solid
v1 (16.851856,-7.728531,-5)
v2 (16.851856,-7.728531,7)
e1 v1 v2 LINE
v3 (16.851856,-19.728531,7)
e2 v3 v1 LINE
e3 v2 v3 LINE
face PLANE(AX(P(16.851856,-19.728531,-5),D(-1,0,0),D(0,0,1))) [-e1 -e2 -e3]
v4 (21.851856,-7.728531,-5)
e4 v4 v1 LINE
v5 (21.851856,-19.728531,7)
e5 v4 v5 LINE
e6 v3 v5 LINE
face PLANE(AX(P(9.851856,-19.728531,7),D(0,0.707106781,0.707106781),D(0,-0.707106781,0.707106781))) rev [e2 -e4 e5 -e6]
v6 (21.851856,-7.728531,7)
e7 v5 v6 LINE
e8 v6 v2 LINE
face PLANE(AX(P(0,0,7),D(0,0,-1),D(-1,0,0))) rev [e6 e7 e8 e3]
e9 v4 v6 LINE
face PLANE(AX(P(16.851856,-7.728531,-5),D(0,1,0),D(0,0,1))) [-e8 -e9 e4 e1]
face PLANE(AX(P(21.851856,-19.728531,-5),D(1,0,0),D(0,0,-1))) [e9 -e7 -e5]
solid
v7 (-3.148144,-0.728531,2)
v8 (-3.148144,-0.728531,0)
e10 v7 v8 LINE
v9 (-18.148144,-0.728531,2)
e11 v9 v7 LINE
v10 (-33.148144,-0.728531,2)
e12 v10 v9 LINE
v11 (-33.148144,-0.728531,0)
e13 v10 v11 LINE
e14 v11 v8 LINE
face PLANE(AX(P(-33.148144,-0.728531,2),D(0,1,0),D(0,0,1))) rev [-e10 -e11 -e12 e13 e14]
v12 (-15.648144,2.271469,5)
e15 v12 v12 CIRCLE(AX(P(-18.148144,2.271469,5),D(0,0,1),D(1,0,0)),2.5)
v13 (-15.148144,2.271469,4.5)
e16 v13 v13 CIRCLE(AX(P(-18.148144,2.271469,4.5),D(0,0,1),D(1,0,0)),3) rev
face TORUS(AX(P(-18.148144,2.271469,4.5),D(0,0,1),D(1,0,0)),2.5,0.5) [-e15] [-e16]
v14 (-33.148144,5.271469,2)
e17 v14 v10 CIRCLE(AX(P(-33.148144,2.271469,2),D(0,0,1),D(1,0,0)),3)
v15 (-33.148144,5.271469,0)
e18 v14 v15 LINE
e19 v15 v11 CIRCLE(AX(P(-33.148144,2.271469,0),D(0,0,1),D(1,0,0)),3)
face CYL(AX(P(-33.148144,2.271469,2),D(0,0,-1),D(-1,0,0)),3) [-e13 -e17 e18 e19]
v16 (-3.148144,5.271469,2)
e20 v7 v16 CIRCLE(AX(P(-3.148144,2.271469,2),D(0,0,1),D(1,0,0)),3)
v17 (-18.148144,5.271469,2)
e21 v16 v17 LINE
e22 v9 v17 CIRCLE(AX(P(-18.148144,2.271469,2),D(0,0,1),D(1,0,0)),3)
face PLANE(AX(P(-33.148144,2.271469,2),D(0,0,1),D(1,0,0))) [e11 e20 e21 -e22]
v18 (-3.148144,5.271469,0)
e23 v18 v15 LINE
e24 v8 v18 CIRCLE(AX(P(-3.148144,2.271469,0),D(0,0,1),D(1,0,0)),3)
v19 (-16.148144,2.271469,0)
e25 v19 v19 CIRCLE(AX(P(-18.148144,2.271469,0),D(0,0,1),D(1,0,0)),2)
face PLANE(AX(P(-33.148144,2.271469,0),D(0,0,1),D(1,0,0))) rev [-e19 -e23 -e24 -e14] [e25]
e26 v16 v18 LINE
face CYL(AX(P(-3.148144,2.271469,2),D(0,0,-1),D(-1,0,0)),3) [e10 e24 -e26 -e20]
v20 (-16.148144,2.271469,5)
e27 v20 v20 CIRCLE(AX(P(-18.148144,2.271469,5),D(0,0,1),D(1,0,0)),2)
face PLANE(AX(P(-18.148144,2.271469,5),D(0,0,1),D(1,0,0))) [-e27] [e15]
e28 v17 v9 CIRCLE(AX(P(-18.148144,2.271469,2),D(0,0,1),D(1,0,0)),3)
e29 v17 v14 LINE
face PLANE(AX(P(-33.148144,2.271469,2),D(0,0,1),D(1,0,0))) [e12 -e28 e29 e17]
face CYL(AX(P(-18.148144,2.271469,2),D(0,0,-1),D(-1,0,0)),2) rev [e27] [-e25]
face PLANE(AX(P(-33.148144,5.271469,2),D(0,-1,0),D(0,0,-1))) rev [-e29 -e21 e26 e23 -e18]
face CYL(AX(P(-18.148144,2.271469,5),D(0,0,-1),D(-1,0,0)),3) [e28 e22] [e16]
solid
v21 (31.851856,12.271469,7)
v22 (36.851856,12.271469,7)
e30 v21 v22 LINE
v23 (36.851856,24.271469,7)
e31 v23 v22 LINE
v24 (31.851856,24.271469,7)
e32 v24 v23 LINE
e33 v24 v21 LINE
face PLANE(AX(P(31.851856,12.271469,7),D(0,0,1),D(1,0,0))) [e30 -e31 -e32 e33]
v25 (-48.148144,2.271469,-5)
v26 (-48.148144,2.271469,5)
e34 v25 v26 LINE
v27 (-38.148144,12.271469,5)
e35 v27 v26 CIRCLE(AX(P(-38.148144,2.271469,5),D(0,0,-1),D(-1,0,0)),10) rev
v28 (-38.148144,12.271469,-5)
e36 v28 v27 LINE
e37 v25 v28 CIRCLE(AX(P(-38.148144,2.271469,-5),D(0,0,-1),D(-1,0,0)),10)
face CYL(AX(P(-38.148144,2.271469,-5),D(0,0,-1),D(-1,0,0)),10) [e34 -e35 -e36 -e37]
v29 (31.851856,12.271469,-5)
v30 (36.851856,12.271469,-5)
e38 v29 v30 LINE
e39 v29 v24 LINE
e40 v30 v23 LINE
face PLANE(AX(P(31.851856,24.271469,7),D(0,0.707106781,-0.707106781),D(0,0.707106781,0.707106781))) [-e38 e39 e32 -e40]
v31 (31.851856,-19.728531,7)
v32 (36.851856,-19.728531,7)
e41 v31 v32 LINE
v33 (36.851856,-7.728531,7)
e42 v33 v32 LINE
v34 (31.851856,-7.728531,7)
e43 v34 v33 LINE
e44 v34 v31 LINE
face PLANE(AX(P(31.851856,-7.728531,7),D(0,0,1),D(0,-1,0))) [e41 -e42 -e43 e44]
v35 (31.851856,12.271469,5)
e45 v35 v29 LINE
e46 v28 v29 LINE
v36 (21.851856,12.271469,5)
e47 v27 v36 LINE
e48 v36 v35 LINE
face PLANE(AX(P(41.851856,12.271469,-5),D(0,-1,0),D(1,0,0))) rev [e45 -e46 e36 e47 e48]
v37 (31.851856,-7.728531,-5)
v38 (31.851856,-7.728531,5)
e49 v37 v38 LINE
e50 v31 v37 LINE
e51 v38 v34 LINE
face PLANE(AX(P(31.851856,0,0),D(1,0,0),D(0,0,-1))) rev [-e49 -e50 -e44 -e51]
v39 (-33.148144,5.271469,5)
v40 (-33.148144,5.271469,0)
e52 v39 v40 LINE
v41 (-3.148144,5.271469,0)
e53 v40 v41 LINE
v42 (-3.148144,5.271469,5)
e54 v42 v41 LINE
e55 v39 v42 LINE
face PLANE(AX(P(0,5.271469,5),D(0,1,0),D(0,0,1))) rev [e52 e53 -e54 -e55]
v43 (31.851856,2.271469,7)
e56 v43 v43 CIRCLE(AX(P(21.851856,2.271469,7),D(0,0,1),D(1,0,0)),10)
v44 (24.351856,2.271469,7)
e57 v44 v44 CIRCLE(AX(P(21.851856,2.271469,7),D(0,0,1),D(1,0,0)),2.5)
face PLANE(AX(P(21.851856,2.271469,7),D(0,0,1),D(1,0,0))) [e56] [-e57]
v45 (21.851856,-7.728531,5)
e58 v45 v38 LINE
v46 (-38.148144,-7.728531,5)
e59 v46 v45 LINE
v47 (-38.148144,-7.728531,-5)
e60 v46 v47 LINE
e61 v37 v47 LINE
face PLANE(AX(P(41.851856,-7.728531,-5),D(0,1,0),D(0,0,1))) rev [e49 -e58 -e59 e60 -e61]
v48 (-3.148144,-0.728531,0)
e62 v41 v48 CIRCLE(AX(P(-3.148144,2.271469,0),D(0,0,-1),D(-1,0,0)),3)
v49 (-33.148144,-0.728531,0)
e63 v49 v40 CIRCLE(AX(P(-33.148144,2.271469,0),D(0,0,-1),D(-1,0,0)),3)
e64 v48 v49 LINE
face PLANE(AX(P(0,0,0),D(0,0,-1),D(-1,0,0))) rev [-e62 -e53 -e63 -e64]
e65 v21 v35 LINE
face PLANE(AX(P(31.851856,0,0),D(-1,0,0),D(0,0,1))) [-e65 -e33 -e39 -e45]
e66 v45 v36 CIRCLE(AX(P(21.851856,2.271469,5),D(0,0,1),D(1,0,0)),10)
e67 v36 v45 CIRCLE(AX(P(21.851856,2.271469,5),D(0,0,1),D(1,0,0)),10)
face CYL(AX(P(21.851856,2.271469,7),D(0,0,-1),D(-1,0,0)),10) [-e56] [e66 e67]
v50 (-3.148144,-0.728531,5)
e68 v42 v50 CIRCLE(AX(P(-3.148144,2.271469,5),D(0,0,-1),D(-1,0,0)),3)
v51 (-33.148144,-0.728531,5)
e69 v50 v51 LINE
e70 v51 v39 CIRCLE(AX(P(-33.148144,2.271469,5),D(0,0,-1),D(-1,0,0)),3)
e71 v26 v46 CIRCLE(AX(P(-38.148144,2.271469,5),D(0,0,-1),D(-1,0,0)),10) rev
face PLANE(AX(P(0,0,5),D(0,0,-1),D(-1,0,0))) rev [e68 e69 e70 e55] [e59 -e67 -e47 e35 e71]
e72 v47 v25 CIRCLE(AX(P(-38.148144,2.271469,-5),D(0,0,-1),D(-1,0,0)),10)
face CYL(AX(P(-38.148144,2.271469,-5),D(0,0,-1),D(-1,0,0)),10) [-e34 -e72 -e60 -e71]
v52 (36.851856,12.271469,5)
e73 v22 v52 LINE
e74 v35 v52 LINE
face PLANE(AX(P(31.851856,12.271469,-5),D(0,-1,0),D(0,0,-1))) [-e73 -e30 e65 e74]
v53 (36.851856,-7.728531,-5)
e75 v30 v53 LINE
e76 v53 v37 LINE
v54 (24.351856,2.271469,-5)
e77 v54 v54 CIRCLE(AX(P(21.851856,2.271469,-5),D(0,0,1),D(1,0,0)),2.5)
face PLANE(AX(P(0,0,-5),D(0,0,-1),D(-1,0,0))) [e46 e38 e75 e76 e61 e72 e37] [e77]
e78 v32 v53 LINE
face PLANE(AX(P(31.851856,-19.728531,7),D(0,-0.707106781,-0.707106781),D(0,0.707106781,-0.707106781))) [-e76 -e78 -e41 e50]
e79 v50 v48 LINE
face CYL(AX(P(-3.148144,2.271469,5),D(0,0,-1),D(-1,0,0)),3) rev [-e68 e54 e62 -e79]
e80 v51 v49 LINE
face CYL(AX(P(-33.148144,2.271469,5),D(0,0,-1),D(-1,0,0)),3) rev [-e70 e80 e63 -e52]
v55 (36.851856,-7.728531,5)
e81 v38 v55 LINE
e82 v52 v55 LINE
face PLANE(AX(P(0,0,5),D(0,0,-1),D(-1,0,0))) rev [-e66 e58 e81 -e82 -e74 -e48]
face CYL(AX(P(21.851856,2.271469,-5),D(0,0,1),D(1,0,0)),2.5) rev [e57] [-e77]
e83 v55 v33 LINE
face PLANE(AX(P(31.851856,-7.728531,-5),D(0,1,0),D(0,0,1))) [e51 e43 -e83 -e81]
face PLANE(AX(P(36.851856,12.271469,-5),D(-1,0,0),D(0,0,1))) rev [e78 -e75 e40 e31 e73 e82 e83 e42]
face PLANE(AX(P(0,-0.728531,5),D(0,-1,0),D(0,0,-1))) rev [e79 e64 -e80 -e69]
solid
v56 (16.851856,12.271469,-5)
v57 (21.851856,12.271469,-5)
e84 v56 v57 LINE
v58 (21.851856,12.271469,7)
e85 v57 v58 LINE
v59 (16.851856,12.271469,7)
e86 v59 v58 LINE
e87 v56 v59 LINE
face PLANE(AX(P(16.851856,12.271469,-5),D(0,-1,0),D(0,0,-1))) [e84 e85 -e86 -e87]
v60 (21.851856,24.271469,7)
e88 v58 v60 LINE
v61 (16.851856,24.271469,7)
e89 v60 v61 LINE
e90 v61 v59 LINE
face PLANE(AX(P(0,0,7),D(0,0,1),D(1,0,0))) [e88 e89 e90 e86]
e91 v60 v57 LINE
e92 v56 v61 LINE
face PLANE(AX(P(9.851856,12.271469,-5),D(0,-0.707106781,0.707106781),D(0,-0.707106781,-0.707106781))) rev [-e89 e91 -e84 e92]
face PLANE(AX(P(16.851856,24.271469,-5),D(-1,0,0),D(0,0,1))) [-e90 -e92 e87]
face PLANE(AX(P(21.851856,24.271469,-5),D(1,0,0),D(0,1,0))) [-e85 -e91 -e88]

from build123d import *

# Parameters (mm, degrees)
SKETCH1_R             = 2
BOSS_EXTRUDE1_DEPTH   = 2
SKETCH2_R             = 3
SKETCH2_R_2           = 2
BOSS_EXTRUDE2_DEPTH   = 3
FILLET1_R             = 0.5
SKETCH4_W             = 90
SKETCH4_H             = 20
BOSS_EXTRUDE3_DEPTH   = 5
SKETCH5_W             = 90
SKETCH5_H             = 20
BOSS_EXTRUDE6_DEPTH   = 5
FILLET3_R             = 10
FILLET4_R             = 10
FILLET5_R             = 10
FILLET6_R             = 10
SKETCH7_R             = 2.5
CUT_EXTRUDE1_DEPTH    = 10
SKETCH8_R             = 10
SKETCH8_R_2           = 2.5
BOSS_EXTRUDE7_DEPTH   = 2
SKETCH9_W             = 5
SKETCH9_H             = 20
CUT_EXTRUDE2_DEPTH    = 10
BOSS_EXTRUDE8_DEPTH   = 5
SKETCH11_W            = 5
SKETCH11_H            = 12
BOSS_EXTRUDE9_DEPTH   = 12
BOSS_EXTRUDE9_2_DEPTH = 12
CUT_EXTRUDE3_DEPTH    = 12


with BuildPart() as part:
    # Sketch1 → Boss-Extrude1 (new body)
    with BuildSketch(Plane.XY):
        with BuildLine():
            Line((-33.148143839, 5.271469366), (-3.148143839, 5.271469366))
            ThreePointArc((-3.148143839, 5.271469366), (-0.148143839, 2.271469366), (-3.148143839, -0.728530634))
            Line((-3.148143839, -0.728530634), (-33.148143839, -0.728530634))
            ThreePointArc((-33.148143839, -0.728530634), (-36.148143839, 2.271469366), (-33.148143839, 5.271469366))
        make_face()
        with Locations((-18.148143839, 2.271469366)):
            Circle(SKETCH1_R, mode=Mode.SUBTRACT)
    extrude(amount=BOSS_EXTRUDE1_DEPTH)

    # Sketch2 → Boss-Extrude2 (add)
    with BuildSketch(Plane.XY.offset(2)):
        with Locations(Location((-18.148143839, 2.271469366, 0), (0, 0, 270))):
            Circle(SKETCH2_R)
        with Locations((-18.148143839, 2.271469366)):
            Circle(SKETCH2_R_2, mode=Mode.SUBTRACT)
    extrude(amount=BOSS_EXTRUDE2_DEPTH)

    # Fillet1
    fillet1_edges = [part.edges().sort_by_distance(p)[0] for p in [
        (-18.148143839, 5.271469366, 5),
    ]]
    fillet(fillet1_edges, radius=FILLET1_R)


with BuildPart() as body_2:
    # Sketch4 → Boss-Extrude3 (new body)
    with BuildSketch(Plane(origin=(0, 0, 0), x_dir=(-1, 0, 0), z_dir=(0, 0, -1))):
        with Locations((3.148143839, 2.271469366)):
            Rectangle(SKETCH4_W, SKETCH4_H)
        with BuildLine():
            ThreePointArc((33.148143839, -0.728530634), (36.148143839, 2.271469366), (33.148143839, 5.271469366))
            Line((33.148143839, 5.271469366), (3.148143839, 5.271469366))
            ThreePointArc((3.148143839, 5.271469366), (0.148143839, 2.271469366), (3.148143839, -0.728530634))
            Line((3.148143839, -0.728530634), (33.148143839, -0.728530634))
        make_face(mode=Mode.SUBTRACT)
    extrude(amount=-BOSS_EXTRUDE3_DEPTH)

    # Fillet3
    fillet3_edges = [body_2.edges().sort_by_distance(p)[0] for p in [
        (-48.148143839, -7.728530634, 2.5),
    ]]
    fillet(fillet3_edges, radius=FILLET3_R)

    # Fillet6
    fillet6_edges = [body_2.edges().sort_by_distance(p)[0] for p in [
        (-48.148143839, 12.271469366, 2.5),
    ]]
    fillet(fillet6_edges, radius=FILLET6_R - 0.0001)  # a hair under: the kernel refuses the full size


with BuildPart() as body_3:
    # Sketch5 → Boss-Extrude6 (new body)
    with BuildSketch(Plane(origin=(0, 0, 0), x_dir=(-1, 0, 0), z_dir=(0, 0, -1))):
        with Locations((3.148143839, 2.271469366)):
            Rectangle(SKETCH5_W, SKETCH5_H)
    extrude(amount=BOSS_EXTRUDE6_DEPTH)

    # Fillet4
    fillet4_edges = [body_3.edges().sort_by_distance(p)[0] for p in [
        (-48.148143839, -7.728530634, -2.5),
    ]]
    fillet(fillet4_edges, radius=FILLET4_R)

    # Fillet5
    fillet5_edges = [body_3.edges().sort_by_distance(p)[0] for p in [
        (-48.148143839, 12.271469366, -2.5),
    ]]
    fillet(fillet5_edges, radius=FILLET5_R - 0.0001)  # a hair under: the kernel refuses the full size


with BuildPart() as cut_extrude1_tool:
    # Sketch7 → Cut-Extrude1 (new body)
    with BuildSketch(Plane.XY.offset(5)):
        with Locations((21.851856161, 2.271469366)):
            Circle(SKETCH7_R)
    extrude(amount=-CUT_EXTRUDE1_DEPTH)


with BuildPart() as body_2_1:
    add(body_2.part)

    # Cut-Extrude1: cut by cut_extrude1_tool
    add(cut_extrude1_tool.part, mode=Mode.SUBTRACT)

    # Sketch8 → Boss-Extrude7 (add)
    with BuildSketch(Plane.XY.offset(5)):
        with Locations(Location((21.851856161, 2.271469366, 0), (0, 0, 270))):
            Circle(SKETCH8_R)
        with Locations((21.851856161, 2.271469366)):
            Circle(SKETCH8_R_2, mode=Mode.SUBTRACT)
    extrude(amount=BOSS_EXTRUDE7_DEPTH)


with BuildPart() as body_3_1:
    add(body_3.part)

    # Cut-Extrude1: cut by cut_extrude1_tool
    add(cut_extrude1_tool.part, mode=Mode.SUBTRACT)


with BuildPart() as cut_extrude2_tool:
    # Sketch9 → Cut-Extrude2 (new body)
    with BuildSketch(Plane.XY.offset(5)):
        with Locations((39.351856161, 2.271469366)):
            Rectangle(SKETCH9_W, SKETCH9_H)
    extrude(amount=-CUT_EXTRUDE2_DEPTH)


with BuildPart() as body_2_2:
    add(body_2_1.part)

    # Cut-Extrude2: cut by cut_extrude2_tool
    add(cut_extrude2_tool.part, mode=Mode.SUBTRACT)



with BuildPart() as body_3_2:
    add(body_3_1.part)

    # Cut-Extrude2: cut by cut_extrude2_tool
    add(cut_extrude2_tool.part, mode=Mode.SUBTRACT)


with BuildPart() as body_2_3:
    add(body_2_2.part)

    add(body_3_2.part)  # Boss-Extrude8 merges body 3
    # Sketch10 → Boss-Extrude8 (add)
    with BuildSketch(Plane(origin=(36.851856161, 0, 0), x_dir=(0, 0, -1), z_dir=(1, 0, 0))):
        Polygon((5, 12.271469366), (-7, 12.271469366), (-7, 24.271469366), align=None)
        Polygon((5, -7.728530634), (-7, -7.728530634), (-7, -19.728530634), align=None)
    extrude(amount=-BOSS_EXTRUDE8_DEPTH)


with BuildPart() as body_3_2_1:
    # Sketch11 → Boss-Extrude9 (new body)
    with BuildSketch(Plane.XY.offset(7)):
        with Locations((19.351856161, 18.271469366)):
            Rectangle(SKETCH11_W, SKETCH11_H)
    extrude(amount=-BOSS_EXTRUDE9_DEPTH)


with BuildPart() as body_4:
    # Sketch11 → Boss-Extrude9 2 (new body)
    with BuildSketch(Plane.XY.offset(7)):
        with Locations((19.351856161, -13.728530634)):
            Rectangle(SKETCH11_W, SKETCH11_H)
    extrude(amount=-BOSS_EXTRUDE9_2_DEPTH)


with BuildPart() as cut_extrude3_tool:
    # Sketch12 → Cut-Extrude3 (new body)
    with BuildSketch(Plane(origin=(21.851856161, 0, 0), x_dir=(0, 0, -1), z_dir=(1, 0, 0))):
        Polygon((-7, 24.271469366), (5, 24.271469366), (5, 12.271469366), align=None)
        Polygon((5, -7.728530634), (5, -19.728530634), (-7, -19.728530634), align=None)
    extrude(amount=-CUT_EXTRUDE3_DEPTH)


with BuildPart() as body_3_2_2:
    add(body_3_2_1.part)

    # Cut-Extrude3: cut by cut_extrude3_tool
    add(cut_extrude3_tool.part, mode=Mode.SUBTRACT)


with BuildPart() as body_4_1:
    add(body_4.part)

    # Cut-Extrude3: cut by cut_extrude3_tool
    add(cut_extrude3_tool.part, mode=Mode.SUBTRACT)


solid = Compound([part.part, body_2_3.part, body_3_2_2.part, body_4_1.part])
